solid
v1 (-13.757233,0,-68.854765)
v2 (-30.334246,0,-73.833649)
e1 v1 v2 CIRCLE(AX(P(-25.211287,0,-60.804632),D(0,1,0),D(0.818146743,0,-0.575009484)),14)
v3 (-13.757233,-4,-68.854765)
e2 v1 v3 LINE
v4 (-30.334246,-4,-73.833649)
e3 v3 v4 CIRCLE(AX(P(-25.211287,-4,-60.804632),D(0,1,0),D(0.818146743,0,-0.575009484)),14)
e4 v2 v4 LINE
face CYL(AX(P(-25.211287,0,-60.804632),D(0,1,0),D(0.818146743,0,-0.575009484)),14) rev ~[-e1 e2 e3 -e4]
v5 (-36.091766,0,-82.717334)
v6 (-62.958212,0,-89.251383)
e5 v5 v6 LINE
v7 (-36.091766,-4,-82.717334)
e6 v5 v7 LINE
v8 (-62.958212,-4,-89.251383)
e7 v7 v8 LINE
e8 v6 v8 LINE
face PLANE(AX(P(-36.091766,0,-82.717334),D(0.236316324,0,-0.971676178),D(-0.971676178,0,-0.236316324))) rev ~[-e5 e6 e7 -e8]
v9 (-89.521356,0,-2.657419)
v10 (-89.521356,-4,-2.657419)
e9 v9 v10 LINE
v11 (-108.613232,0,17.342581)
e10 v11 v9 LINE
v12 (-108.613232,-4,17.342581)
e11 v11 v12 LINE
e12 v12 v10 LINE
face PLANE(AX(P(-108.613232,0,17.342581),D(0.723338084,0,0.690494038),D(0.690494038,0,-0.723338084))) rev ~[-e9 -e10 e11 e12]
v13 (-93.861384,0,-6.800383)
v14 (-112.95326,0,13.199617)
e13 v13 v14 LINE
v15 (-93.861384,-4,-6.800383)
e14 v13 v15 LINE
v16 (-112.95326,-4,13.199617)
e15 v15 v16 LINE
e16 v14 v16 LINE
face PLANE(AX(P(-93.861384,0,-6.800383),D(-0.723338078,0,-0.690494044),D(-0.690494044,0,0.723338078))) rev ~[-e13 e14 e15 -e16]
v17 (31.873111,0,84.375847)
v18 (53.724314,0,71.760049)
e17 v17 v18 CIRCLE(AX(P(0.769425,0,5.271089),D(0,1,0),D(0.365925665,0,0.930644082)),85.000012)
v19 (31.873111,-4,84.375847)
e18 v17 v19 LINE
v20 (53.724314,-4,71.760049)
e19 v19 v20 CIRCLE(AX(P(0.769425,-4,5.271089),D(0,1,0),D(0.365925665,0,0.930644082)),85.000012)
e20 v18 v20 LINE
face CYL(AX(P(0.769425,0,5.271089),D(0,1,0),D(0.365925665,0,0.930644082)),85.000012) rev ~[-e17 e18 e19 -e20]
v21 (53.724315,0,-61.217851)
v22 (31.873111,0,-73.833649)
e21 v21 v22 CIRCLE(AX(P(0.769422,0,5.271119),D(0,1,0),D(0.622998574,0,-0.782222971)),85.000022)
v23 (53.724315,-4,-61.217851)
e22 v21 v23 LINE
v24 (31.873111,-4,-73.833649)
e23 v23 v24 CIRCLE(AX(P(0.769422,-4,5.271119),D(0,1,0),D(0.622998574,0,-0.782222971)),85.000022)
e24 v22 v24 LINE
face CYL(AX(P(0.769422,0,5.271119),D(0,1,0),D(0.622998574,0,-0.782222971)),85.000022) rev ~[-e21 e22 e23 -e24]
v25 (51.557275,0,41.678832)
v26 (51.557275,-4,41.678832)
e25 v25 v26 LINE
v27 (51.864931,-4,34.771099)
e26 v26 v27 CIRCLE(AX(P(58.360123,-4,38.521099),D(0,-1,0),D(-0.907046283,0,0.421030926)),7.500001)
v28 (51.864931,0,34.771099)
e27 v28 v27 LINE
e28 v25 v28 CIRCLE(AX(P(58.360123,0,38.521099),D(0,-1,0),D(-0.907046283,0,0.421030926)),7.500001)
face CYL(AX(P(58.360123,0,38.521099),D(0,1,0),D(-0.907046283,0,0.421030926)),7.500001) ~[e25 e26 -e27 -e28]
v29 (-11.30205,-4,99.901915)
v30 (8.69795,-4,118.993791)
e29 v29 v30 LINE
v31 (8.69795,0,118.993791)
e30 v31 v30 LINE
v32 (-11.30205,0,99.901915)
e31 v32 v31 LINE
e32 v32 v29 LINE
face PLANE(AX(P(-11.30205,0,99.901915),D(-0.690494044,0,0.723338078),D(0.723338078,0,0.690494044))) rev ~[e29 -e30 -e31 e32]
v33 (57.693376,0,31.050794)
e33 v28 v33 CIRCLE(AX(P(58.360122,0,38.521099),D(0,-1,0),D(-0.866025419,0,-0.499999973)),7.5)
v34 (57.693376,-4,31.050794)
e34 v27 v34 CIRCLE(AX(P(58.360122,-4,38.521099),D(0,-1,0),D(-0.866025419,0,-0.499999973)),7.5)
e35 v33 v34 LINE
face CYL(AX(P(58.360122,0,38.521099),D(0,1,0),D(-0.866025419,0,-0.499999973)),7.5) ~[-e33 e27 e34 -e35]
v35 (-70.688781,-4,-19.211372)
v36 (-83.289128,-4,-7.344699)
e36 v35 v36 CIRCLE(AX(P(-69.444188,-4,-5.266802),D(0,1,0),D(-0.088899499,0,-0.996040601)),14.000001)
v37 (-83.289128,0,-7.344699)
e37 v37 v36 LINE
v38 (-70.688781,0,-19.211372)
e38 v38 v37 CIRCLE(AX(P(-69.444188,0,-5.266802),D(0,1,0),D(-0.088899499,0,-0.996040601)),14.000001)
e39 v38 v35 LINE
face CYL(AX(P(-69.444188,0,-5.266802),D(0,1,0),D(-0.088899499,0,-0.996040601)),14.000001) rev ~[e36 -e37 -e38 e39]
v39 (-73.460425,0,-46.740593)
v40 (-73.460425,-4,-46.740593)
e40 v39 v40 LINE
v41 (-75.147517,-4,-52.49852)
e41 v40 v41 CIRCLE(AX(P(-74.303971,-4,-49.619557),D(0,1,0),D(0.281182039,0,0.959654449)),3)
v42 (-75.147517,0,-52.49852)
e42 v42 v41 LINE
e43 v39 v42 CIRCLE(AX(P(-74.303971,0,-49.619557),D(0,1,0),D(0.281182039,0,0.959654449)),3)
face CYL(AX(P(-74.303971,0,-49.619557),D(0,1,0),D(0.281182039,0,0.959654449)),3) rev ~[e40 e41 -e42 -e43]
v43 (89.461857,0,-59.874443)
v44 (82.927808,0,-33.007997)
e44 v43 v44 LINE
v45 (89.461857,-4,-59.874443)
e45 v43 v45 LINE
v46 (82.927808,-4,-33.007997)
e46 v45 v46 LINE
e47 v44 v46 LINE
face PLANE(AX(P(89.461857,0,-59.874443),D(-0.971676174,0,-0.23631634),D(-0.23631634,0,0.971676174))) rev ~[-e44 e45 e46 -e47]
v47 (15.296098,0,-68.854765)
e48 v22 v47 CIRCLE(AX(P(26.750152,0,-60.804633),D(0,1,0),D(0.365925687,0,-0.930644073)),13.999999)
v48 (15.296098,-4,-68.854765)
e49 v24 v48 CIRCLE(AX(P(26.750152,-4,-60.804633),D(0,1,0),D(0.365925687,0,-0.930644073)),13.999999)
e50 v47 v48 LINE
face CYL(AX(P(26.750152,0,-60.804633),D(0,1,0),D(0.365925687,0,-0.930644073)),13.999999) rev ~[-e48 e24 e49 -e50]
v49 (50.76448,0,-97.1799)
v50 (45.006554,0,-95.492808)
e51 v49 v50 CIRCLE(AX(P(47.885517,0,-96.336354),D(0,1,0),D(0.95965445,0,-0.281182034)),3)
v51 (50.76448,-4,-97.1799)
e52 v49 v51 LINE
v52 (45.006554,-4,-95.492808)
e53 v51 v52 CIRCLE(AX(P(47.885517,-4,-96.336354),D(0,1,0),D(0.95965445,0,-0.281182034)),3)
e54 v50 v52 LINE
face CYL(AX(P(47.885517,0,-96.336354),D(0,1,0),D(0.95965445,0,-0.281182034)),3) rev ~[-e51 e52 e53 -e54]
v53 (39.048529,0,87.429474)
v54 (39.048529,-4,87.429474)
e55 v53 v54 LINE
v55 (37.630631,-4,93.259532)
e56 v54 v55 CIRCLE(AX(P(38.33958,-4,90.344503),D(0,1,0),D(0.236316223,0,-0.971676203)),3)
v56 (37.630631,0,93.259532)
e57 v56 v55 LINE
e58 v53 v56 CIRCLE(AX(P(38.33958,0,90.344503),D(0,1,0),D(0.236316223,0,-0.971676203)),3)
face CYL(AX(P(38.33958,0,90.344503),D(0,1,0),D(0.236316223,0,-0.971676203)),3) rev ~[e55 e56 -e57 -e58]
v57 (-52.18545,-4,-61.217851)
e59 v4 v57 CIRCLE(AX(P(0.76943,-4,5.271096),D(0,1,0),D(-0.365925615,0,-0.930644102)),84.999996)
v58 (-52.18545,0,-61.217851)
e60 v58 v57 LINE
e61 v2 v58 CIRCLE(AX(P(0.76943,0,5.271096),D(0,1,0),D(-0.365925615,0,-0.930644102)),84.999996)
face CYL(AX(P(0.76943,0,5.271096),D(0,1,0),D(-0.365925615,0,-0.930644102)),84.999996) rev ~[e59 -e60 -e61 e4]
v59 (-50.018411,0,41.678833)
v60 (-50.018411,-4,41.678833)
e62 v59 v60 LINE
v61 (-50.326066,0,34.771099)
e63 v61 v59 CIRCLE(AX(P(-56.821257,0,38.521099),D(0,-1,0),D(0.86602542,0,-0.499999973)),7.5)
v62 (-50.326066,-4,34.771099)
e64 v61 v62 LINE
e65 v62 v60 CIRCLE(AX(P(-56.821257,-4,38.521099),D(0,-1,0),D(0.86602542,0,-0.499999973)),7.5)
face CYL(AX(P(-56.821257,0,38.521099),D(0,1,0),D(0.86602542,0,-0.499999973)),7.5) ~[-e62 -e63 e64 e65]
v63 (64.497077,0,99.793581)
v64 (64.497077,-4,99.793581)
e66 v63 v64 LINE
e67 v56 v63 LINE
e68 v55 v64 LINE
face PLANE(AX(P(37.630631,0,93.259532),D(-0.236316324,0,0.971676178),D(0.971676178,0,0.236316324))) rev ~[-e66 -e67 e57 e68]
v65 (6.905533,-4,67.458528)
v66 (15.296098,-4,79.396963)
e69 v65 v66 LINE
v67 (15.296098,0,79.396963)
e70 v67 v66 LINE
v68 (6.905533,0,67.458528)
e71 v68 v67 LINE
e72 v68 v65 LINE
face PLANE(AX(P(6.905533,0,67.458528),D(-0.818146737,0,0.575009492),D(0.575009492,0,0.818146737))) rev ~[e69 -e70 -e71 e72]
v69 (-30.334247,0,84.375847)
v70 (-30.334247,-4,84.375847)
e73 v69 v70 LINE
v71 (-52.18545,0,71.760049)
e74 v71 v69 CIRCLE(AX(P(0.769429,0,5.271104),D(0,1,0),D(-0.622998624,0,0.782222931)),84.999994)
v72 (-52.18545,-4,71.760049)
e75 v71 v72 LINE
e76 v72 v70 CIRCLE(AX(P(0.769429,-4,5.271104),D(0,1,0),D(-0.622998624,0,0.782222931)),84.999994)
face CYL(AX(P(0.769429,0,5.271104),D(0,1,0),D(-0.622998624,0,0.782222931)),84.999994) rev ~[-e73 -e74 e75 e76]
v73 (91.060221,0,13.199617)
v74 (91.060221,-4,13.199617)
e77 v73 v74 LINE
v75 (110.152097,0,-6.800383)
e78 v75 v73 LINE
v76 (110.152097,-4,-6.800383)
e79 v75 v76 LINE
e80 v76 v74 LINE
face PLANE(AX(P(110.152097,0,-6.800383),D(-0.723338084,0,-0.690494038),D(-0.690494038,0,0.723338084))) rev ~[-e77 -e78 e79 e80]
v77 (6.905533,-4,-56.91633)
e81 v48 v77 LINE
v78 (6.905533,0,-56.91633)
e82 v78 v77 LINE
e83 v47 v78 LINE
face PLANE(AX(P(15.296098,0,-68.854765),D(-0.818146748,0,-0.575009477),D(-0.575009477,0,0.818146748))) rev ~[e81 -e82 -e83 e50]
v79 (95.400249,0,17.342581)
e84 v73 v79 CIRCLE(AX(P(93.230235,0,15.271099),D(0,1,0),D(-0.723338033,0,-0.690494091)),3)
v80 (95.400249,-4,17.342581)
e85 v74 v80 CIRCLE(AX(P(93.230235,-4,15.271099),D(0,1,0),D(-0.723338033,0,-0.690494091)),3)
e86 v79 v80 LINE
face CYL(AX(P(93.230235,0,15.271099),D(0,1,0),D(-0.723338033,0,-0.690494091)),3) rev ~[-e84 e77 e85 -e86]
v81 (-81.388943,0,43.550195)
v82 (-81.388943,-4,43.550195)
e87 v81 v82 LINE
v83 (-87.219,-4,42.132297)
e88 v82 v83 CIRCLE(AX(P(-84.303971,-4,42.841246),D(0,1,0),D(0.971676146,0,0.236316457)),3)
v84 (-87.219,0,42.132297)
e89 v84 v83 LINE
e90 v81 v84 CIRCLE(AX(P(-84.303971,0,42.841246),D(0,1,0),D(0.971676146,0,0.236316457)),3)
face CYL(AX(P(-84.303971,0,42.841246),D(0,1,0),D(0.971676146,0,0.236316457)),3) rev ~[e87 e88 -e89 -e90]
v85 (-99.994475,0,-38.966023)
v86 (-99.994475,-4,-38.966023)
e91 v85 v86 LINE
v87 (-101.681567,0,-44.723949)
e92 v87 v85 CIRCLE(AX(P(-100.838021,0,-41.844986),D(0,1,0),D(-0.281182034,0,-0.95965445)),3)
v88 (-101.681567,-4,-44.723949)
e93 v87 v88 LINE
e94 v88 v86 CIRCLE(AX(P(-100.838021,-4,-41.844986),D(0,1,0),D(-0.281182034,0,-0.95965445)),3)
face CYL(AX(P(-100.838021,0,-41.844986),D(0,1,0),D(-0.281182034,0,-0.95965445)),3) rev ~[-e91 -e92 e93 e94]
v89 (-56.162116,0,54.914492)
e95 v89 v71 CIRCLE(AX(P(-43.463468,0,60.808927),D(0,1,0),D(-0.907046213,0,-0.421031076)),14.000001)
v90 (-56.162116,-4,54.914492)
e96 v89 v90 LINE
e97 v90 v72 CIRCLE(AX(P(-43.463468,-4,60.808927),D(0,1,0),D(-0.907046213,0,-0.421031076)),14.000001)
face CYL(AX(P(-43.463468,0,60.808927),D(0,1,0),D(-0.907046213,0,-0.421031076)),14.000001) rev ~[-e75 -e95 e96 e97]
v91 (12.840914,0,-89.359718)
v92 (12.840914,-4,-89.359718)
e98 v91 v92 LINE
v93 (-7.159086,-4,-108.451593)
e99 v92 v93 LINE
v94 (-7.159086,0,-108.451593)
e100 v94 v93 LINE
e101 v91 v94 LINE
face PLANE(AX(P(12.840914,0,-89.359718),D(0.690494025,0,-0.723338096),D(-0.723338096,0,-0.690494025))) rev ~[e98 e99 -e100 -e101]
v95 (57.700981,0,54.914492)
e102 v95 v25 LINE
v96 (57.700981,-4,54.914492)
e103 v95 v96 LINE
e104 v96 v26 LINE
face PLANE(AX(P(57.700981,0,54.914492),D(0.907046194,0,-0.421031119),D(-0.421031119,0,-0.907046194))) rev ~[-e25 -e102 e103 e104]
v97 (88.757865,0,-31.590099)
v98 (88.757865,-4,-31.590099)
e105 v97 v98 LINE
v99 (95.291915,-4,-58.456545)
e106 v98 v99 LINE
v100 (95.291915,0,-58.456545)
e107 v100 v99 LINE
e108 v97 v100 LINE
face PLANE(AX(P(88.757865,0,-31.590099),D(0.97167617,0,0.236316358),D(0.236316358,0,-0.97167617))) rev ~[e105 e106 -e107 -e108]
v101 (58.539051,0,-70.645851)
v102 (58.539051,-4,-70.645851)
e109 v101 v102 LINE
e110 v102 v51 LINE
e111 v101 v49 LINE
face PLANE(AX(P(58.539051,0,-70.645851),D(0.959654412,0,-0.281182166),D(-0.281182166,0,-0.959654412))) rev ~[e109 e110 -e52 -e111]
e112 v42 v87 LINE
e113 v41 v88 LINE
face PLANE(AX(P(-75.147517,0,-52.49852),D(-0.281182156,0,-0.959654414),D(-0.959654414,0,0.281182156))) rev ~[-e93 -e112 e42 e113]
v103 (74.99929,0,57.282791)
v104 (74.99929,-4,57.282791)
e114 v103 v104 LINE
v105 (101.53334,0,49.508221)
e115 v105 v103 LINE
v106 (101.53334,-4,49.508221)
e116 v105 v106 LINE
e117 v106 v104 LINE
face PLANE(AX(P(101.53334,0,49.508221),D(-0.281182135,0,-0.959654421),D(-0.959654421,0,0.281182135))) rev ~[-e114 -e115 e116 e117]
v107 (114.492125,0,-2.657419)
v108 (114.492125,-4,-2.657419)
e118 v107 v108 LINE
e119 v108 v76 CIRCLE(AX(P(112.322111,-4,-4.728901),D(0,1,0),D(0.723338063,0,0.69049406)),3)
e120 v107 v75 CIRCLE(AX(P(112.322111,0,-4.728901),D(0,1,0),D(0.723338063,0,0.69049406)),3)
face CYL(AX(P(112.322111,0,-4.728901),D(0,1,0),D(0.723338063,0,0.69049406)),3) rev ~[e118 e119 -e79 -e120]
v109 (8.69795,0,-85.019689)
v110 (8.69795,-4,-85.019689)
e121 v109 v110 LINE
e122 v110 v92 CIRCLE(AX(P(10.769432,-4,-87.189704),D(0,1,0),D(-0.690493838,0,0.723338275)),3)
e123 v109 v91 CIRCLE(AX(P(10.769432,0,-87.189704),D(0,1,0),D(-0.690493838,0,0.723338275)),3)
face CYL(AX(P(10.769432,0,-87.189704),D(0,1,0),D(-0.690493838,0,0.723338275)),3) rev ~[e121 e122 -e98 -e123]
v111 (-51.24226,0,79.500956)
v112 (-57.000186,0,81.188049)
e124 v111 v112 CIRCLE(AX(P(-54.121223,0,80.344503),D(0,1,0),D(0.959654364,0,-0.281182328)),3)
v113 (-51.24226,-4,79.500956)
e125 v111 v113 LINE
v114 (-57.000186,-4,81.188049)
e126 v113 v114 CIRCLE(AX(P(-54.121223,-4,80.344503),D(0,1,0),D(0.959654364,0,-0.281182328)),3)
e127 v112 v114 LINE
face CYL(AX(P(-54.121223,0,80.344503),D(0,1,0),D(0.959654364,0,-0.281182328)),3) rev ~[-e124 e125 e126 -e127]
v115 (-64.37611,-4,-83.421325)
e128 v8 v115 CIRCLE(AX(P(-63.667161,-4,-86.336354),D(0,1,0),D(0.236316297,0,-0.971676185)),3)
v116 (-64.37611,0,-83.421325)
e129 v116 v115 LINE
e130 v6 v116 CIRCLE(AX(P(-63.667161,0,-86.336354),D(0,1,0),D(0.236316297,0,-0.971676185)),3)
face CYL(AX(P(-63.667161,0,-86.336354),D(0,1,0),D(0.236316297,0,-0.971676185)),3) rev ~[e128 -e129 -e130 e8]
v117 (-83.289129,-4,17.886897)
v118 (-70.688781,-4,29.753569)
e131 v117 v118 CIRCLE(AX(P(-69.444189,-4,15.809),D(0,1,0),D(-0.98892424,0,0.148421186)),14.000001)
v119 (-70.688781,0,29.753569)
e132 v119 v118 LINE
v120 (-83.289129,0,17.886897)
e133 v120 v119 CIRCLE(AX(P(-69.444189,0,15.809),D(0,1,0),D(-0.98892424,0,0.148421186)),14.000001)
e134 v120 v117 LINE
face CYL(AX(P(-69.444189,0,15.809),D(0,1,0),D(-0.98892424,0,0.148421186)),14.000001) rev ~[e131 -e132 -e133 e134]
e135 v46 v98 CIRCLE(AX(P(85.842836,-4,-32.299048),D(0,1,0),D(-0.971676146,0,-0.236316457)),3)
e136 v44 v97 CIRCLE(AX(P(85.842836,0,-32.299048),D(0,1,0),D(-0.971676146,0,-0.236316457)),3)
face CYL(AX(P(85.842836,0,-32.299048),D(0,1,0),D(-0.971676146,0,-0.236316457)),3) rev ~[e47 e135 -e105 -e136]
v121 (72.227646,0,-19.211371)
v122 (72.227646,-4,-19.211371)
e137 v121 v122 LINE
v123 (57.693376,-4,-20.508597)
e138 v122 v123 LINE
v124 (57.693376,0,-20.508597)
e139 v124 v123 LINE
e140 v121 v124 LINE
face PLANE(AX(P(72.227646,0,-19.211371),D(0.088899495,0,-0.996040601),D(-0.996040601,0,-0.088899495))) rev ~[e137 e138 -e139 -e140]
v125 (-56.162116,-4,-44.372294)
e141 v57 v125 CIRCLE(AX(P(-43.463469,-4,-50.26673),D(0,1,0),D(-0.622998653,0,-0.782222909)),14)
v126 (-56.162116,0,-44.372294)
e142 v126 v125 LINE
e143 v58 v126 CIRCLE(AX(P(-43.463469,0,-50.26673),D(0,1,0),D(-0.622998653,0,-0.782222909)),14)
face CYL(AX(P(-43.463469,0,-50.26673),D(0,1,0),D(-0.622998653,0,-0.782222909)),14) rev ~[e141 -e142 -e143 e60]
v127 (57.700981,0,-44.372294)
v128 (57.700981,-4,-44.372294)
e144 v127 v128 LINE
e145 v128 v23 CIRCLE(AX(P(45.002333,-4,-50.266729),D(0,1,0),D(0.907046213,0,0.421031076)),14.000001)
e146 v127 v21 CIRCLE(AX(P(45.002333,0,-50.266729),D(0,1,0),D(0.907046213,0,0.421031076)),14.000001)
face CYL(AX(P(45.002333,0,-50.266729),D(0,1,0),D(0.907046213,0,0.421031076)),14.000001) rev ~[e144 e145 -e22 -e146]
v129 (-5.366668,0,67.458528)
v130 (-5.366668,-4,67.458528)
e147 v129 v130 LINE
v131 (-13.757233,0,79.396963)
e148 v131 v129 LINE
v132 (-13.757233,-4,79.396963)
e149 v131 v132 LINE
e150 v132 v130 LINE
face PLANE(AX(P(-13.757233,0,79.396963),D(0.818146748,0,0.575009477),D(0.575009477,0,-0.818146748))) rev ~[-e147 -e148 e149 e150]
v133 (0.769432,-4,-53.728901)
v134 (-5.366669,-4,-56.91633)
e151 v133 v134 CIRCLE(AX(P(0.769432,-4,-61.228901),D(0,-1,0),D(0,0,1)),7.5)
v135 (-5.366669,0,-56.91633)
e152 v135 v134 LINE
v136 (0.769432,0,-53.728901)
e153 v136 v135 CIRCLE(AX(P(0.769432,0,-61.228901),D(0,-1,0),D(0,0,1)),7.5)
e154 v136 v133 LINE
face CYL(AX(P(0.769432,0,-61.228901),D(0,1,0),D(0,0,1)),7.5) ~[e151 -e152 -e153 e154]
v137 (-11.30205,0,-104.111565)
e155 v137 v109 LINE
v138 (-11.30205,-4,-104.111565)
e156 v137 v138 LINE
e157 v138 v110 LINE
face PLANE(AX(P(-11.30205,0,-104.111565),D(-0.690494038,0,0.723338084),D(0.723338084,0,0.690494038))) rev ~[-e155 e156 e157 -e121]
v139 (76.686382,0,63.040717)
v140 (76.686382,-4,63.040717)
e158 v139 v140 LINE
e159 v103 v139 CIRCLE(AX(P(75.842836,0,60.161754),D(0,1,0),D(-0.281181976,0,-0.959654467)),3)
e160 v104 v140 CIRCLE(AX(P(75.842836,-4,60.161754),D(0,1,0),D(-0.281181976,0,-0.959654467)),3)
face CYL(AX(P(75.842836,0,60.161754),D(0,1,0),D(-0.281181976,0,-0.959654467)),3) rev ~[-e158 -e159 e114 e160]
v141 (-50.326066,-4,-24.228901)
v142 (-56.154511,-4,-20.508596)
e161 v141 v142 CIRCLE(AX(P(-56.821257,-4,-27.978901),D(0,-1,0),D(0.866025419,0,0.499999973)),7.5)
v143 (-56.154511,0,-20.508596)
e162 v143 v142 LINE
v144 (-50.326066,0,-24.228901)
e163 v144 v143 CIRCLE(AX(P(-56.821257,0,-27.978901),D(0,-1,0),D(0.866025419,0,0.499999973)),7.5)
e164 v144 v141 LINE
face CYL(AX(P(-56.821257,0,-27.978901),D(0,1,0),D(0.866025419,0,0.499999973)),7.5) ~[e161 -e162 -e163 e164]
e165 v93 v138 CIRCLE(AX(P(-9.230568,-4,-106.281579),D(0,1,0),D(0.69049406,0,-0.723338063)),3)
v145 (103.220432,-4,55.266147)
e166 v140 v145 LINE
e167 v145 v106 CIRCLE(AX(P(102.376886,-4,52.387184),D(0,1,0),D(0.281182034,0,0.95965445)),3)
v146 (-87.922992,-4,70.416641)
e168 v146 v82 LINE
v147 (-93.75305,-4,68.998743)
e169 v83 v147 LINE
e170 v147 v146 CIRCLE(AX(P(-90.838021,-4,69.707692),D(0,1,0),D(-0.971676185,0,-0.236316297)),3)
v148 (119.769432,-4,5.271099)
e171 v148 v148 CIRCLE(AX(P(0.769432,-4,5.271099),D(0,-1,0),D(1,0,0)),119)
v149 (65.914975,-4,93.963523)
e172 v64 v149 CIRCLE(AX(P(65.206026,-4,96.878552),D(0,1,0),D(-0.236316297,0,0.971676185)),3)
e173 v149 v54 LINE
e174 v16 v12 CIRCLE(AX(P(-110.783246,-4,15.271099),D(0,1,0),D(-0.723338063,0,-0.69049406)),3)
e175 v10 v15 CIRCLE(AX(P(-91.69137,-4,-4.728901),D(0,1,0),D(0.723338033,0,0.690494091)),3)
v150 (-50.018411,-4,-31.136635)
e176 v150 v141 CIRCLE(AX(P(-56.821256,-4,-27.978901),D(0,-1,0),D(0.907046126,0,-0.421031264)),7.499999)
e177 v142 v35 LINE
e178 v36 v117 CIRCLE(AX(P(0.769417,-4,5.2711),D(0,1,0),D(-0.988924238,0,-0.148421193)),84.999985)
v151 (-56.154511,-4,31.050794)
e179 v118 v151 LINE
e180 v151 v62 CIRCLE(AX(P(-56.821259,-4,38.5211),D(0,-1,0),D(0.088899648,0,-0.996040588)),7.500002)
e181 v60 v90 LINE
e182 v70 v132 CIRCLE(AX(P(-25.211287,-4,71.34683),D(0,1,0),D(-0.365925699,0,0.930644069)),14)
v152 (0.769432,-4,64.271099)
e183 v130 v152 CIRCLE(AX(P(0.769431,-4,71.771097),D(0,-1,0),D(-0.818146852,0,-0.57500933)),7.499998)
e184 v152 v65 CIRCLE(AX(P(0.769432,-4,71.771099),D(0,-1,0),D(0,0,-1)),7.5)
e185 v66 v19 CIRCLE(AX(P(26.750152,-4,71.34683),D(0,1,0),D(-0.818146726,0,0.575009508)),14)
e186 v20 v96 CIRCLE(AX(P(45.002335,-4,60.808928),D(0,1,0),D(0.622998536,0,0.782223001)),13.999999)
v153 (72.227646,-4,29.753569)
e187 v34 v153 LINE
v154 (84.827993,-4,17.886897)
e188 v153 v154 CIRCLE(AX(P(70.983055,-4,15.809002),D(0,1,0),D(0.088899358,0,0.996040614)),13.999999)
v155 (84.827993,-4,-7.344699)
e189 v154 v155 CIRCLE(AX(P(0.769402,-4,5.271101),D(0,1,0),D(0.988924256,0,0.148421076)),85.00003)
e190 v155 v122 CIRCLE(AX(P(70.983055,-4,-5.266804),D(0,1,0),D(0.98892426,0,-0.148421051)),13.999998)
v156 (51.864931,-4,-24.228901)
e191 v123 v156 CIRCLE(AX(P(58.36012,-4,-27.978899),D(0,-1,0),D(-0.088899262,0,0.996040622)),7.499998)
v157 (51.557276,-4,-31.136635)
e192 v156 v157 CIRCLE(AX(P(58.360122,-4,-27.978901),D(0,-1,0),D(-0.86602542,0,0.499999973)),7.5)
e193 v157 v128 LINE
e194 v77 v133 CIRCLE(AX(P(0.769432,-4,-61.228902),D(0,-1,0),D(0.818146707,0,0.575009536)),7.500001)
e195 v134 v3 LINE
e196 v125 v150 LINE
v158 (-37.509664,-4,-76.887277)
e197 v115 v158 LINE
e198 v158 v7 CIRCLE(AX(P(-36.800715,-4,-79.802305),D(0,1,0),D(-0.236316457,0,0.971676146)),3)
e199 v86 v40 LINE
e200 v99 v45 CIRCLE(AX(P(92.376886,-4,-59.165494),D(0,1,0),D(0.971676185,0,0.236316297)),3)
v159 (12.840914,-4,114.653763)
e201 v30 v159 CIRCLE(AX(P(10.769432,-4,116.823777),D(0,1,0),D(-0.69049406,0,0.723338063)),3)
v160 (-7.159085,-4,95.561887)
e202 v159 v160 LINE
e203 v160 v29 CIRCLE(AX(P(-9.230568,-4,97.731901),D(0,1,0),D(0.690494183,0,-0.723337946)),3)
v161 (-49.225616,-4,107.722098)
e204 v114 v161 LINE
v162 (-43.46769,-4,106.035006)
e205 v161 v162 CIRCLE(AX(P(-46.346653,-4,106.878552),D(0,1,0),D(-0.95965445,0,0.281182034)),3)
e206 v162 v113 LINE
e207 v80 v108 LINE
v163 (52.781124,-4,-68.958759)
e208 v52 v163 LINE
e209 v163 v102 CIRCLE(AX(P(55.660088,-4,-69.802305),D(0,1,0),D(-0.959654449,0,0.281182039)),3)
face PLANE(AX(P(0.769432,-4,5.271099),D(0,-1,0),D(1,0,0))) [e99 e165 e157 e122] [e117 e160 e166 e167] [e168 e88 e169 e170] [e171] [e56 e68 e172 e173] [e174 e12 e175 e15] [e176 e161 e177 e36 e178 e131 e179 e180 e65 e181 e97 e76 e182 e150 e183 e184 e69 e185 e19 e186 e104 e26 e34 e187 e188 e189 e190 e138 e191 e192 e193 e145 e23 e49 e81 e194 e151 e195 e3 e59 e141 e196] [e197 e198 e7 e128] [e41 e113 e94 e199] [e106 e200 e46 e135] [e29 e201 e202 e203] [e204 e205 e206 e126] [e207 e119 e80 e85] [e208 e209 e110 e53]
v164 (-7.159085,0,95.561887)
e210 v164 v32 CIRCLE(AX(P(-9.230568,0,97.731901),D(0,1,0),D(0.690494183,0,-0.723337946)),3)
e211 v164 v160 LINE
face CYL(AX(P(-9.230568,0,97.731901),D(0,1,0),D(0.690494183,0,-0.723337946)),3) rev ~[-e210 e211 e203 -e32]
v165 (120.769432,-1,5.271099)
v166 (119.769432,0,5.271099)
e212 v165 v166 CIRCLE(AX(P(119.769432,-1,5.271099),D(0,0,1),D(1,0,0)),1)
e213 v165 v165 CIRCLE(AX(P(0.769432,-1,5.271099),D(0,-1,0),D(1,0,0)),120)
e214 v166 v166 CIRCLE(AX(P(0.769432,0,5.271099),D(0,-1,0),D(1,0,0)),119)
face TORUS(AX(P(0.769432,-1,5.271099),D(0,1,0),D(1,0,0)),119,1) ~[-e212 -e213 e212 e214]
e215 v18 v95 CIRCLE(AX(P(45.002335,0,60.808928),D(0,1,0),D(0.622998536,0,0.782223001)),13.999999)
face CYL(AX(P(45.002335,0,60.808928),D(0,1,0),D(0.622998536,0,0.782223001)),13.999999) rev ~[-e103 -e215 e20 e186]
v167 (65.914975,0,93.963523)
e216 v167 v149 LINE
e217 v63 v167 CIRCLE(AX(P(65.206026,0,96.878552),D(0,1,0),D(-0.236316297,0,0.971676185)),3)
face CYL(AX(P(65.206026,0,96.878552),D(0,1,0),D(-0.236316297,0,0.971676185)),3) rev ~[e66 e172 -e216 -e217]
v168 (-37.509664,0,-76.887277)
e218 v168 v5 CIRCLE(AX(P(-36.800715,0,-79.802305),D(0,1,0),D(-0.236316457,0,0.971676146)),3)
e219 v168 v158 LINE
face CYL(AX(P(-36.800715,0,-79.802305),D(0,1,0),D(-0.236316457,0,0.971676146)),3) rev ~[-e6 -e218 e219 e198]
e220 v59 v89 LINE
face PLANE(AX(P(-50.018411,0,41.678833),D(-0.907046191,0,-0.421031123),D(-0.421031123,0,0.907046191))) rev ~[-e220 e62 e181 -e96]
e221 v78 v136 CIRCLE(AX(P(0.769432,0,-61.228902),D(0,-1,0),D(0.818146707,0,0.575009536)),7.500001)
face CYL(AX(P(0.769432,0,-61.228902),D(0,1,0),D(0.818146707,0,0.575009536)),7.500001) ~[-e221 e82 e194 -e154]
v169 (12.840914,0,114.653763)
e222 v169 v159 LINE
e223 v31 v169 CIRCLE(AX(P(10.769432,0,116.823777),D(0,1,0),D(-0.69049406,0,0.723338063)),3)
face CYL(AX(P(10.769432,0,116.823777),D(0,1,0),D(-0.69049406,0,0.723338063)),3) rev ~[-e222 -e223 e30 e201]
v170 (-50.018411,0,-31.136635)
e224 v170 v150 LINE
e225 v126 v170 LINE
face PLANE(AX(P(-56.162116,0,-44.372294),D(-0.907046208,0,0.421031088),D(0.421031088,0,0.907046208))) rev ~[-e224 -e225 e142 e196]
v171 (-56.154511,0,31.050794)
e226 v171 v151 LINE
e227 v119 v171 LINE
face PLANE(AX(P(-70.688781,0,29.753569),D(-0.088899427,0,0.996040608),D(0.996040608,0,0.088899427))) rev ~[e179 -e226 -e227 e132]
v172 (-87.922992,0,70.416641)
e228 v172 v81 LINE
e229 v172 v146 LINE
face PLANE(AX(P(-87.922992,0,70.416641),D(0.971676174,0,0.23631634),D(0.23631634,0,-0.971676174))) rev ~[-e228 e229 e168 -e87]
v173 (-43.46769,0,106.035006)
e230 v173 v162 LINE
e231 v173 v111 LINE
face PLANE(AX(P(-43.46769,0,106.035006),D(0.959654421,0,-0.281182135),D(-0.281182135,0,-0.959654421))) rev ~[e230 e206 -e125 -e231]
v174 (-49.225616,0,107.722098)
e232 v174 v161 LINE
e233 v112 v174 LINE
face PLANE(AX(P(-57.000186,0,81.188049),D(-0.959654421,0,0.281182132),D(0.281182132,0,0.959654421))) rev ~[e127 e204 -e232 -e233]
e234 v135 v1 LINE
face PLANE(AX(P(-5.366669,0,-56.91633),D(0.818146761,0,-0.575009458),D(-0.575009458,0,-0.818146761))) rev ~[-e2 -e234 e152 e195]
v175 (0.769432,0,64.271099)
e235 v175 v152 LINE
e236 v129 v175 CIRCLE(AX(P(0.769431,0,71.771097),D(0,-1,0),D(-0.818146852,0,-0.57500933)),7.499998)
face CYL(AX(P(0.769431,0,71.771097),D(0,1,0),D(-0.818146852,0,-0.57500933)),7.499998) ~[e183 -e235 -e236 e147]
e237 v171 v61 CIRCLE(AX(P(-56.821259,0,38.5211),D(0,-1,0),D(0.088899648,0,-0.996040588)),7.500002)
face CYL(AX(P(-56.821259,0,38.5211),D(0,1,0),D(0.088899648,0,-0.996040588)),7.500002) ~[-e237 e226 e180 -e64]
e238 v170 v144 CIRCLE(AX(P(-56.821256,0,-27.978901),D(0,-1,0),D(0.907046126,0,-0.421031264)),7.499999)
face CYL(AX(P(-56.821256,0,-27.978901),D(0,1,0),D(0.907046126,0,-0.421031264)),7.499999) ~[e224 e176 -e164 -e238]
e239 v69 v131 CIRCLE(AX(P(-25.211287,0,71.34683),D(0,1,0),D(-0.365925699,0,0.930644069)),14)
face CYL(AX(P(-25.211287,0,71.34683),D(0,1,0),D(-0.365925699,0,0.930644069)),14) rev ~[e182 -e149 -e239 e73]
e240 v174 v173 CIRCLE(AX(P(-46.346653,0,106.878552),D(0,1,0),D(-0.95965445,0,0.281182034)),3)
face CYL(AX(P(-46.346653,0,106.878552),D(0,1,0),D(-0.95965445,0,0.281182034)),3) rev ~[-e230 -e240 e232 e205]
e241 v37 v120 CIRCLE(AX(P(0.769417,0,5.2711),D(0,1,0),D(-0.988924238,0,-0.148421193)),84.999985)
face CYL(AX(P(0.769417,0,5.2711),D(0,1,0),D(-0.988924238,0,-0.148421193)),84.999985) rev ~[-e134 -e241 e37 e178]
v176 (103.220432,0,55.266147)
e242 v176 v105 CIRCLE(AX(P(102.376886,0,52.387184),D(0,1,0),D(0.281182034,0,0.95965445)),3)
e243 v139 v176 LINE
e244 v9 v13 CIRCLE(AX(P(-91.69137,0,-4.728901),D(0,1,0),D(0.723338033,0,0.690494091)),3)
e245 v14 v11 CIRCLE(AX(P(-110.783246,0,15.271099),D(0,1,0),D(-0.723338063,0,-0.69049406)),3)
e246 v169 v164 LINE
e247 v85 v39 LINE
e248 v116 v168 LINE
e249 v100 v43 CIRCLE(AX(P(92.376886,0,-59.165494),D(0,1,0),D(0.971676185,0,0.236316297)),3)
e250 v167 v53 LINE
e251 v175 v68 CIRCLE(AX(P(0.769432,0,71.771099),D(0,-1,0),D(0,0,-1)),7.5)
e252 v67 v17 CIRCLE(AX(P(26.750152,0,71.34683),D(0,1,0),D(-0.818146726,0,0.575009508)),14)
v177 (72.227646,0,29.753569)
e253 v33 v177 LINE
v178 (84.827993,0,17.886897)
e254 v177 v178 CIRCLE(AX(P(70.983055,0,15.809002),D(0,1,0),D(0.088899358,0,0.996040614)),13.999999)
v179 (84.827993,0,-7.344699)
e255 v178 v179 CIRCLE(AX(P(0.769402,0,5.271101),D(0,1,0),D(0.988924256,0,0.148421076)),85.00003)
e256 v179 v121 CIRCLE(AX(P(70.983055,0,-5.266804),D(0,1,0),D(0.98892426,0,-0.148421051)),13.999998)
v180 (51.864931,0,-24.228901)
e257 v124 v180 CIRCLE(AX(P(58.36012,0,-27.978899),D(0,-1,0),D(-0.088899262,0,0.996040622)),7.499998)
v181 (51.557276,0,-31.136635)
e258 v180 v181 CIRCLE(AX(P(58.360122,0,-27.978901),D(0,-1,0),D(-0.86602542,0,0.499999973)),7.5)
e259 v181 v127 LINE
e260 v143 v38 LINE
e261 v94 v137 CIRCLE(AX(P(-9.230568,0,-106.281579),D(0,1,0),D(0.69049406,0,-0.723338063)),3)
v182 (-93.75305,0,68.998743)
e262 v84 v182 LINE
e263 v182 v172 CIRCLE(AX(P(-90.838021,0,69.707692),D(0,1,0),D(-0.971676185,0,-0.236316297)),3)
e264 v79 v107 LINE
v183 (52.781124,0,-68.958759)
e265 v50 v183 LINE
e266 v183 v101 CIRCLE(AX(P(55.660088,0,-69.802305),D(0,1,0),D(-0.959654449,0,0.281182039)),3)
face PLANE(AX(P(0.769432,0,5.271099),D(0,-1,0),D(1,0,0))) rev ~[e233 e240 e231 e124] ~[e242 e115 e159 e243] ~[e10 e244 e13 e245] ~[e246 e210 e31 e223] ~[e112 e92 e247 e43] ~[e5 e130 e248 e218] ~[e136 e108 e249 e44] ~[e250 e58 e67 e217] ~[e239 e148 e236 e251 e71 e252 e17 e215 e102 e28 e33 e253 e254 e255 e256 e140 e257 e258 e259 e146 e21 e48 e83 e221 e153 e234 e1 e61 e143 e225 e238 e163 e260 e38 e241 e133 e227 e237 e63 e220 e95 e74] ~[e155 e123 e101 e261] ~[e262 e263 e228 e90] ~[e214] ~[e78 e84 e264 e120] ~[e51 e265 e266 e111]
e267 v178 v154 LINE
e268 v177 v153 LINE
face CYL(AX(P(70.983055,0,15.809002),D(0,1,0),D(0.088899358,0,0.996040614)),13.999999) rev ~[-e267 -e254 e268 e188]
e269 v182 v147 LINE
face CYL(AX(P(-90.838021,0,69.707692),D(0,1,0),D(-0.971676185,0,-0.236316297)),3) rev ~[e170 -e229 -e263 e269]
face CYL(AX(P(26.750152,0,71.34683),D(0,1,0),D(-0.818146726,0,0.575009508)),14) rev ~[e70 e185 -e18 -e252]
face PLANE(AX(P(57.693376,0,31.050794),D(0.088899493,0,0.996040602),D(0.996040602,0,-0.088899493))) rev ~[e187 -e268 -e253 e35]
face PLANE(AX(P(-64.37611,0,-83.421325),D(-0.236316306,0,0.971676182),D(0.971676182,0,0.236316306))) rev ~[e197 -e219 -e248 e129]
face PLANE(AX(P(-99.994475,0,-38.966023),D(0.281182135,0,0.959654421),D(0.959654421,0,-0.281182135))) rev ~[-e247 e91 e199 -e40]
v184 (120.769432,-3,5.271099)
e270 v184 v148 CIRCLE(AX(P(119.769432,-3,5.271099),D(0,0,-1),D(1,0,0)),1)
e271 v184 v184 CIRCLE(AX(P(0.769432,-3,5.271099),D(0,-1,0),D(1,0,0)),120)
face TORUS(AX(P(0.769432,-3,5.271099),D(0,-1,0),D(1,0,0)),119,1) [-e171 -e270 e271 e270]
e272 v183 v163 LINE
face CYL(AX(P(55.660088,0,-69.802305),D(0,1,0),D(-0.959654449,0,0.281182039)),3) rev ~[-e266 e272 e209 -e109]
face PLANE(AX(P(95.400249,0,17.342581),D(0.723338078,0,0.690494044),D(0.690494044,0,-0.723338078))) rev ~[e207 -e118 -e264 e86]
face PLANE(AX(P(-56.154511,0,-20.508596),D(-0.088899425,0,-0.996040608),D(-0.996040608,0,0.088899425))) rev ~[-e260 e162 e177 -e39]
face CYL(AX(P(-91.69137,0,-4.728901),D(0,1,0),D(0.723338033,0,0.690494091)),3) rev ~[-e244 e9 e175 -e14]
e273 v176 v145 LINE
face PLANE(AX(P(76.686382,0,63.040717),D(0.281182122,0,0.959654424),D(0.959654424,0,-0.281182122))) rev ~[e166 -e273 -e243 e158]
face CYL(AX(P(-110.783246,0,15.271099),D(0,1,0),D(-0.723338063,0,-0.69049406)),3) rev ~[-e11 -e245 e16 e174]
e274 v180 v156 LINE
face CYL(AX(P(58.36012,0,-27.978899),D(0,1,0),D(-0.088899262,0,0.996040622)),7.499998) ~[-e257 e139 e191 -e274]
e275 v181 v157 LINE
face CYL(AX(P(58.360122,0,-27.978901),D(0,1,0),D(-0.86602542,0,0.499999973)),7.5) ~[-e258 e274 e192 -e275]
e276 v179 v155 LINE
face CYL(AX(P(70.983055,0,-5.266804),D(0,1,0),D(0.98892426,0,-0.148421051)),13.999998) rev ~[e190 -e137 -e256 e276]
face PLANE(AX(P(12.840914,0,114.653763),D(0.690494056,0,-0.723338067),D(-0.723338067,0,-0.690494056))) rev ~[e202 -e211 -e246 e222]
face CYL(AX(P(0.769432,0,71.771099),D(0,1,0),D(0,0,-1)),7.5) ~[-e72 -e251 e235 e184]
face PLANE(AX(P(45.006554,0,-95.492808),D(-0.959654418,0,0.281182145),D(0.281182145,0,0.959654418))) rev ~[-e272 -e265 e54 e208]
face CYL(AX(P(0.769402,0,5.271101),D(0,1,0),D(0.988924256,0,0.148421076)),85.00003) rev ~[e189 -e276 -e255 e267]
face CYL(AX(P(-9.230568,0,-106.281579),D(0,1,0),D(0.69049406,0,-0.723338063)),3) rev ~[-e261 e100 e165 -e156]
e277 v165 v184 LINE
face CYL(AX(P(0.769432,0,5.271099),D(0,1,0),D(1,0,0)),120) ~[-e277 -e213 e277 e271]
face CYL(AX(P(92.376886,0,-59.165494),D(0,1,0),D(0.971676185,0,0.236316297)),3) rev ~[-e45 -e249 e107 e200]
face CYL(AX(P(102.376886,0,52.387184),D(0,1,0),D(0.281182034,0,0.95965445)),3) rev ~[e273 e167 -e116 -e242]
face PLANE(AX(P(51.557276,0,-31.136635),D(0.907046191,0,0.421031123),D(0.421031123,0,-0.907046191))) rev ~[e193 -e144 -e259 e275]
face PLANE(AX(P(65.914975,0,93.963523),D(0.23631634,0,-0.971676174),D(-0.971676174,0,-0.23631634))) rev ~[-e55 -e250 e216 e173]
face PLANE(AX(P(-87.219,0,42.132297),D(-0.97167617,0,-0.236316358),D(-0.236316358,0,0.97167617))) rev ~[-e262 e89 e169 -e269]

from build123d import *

# Parameters (mm, degrees)
F0_R     = 120
F1_DEPTH = 4
F2_R     = 1
F3_R     = 1


# Not quite as in the source:
# - ends of sketch curves that miss each other by under 0.0002 mm in the source are joined


with BuildPart() as f1:
    # F0 (on Front) → F1 (new body)
    with BuildSketch(Plane.XZ):
        with Locations((0.769432, 5.271099)):
            Circle(F0_R)
        with BuildLine():
            ThreePointArc((-62.9582121085, -89.2513825538), (-66.5821895538, -87.0453028915), (-64.3761098915, -83.4213254462))
            Line((-64.3761098915, -83.4213254462), (-37.509664, -76.887277))
            ThreePointArc((-37.509664, -76.887277), (-33.8856864462, -79.0933561085), (-36.0917661085, -82.7173335538))
            Line((-36.0917661085, -82.7173335538), (-62.9582121085, -89.2513825538))
        make_face(mode=Mode.SUBTRACT)
        with BuildLine():
            ThreePointArc((-101.6815671027, -44.7239493504), (-103.7169843504, -41.0014398973), (-99.9944748973, -38.9660226496))
            Line((-99.9944748973, -38.9660226496), (-73.460425, -46.740593))
            ThreePointArc((-73.460425, -46.740593), (-71.4250076496, -50.4631031027), (-75.1475171027, -52.4985203504))
            Line((-75.1475171027, -52.4985203504), (-101.6815671027, -44.7239493504))
        make_face(mode=Mode.SUBTRACT)
        with BuildLine():
            ThreePointArc((-112.9532601885, 13.1996168201), (-112.8547281799, 17.4411131885), (-108.6132318115, 17.3425811799))
            Line((-108.6132318115, 17.3425811799), (-89.521356, -2.657419))
            ThreePointArc((-89.521356, -2.657419), (-89.6198878201, -6.8989151885), (-93.8613841885, -6.8003831799))
            Line((-93.8613841885, -6.8003831799), (-112.9532601885, 13.1996168201))
        make_face(mode=Mode.SUBTRACT)
        with BuildLine():
            ThreePointArc((-7.1590858201, -108.4515931885), (-11.4005821885, -108.3530611799), (-11.3020501799, -104.1115648115))
            Line((-11.3020501799, -104.1115648115), (8.69795, -85.019689))
            ThreePointArc((8.69795, -85.019689), (12.9394461885, -85.1182218201), (12.8409141799, -89.3597181885))
            Line((12.8409141799, -89.3597181885), (-7.1590858201, -108.4515931885))
        make_face(mode=Mode.SUBTRACT)
        with BuildLine():
            ThreePointArc((50.7644803504, -97.1799001027), (47.0419708973, -99.2153173504), (45.0065536496, -95.4928078973))
            Line((45.0065536496, -95.4928078973), (52.781124, -68.958759))
            ThreePointArc((52.781124, -68.958759), (56.5036341027, -66.9233416496), (58.5390513504, -70.6458511027))
            Line((58.5390513504, -70.6458511027), (50.7644803504, -97.1799001027))
        make_face(mode=Mode.SUBTRACT)
        with BuildLine():
            ThreePointArc((95.2919145538, -58.4565451085), (93.0858348915, -62.0805225538), (89.4618574462, -59.8744428915))
            Line((89.4618574462, -59.8744428915), (82.927808, -33.007997))
            ThreePointArc((82.927808, -33.007997), (85.1338871085, -29.3840194462), (88.7578645538, -31.5900991085))
            Line((88.7578645538, -31.5900991085), (95.2919145538, -58.4565451085))
        make_face(mode=Mode.SUBTRACT)
        with BuildLine():
            ThreePointArc((114.4921251885, -2.6574188201), (114.3935931799, -6.8989151885), (110.1520968115, -6.8003831799))
            Line((110.1520968115, -6.8003831799), (91.060221, 13.199617))
            ThreePointArc((91.060221, 13.199617), (91.1587528201, 17.4411131885), (95.4002491885, 17.3425811799))
            Line((95.4002491885, 17.3425811799), (114.4921251885, -2.6574188201))
        make_face(mode=Mode.SUBTRACT)
        with BuildLine():
            ThreePointArc((-93.7530495538, 68.9987431085), (-91.5469698915, 72.6227205538), (-87.9229924462, 70.4166408915))
            Line((-87.9229924462, 70.4166408915), (-81.388943, 43.550195))
            ThreePointArc((-81.388943, 43.550195), (-83.5950221085, 39.9262174462), (-87.2189995538, 42.1322971085))
            Line((-87.2189995538, 42.1322971085), (-93.7530495538, 68.9987431085))
        make_face(mode=Mode.SUBTRACT)
        with BuildLine():
            ThreePointArc((-49.2256163504, 107.7220981027), (-45.5031068973, 109.7575153504), (-43.4676896496, 106.0350058973))
            Line((-43.4676896496, 106.0350058973), (-51.24226, 79.500956))
            ThreePointArc((-51.24226, 79.500956), (-54.9647691027, 77.4655396496), (-57.0001863504, 81.1880491027))
            Line((-57.0001863504, 81.1880491027), (-49.2256163504, 107.7220981027))
        make_face(mode=Mode.SUBTRACT)
        with BuildLine():
            ThreePointArc((15.296097835, 79.396963116), (22.7229925826, 84.7551105395), (31.8731110928, 84.3758472359))
            ThreePointArc((31.8731110928, 84.3758472359), (43.2694321028, 78.8832582623), (53.724314001, 71.7600490012))
            ThreePointArc((53.724314001, 71.7600490012), (58.6278254217, 64.0254452963), (57.7009806311, 54.9144921712))
            Line((57.7009806311, 54.9144921712), (51.557275, 41.678832))
            ThreePointArc((51.557275, 41.678832), (50.8675495212, 38.1873960638), (51.8649313537, 34.7710992042))
            ThreePointArc((51.8649313537, 34.7710992042), (54.3248400002, 32.1991927067), (57.6933760416, 31.0507944662))
            Line((57.6933760416, 31.0507944662), (72.227646, 29.753569))
            ThreePointArc((72.227646, 29.753569), (80.5813855597, 26.0007639127), (84.8279934344, 17.8868970652))
            ThreePointArc((84.8279934344, 17.8868970652), (85.769432, 5.271099), (84.8279927873, -7.3446989681))
            ThreePointArc((84.8279927873, -7.3446989681), (80.5813855597, -15.4585659127), (72.2276460446, -19.2113714997))
            Line((72.2276460446, -19.2113714997), (57.693376, -20.508597))
            ThreePointArc((57.693376, -20.508597), (54.3248400002, -21.6569947067), (51.8649313537, -24.2289012042))
            ThreePointArc((51.8649313537, -24.2289012042), (50.8675495212, -27.6451980638), (51.5572758618, -31.1366350642))
            Line((51.5572758618, -31.1366350642), (57.700981, -44.372294))
            ThreePointArc((57.700981, -44.372294), (58.6278254217, -53.4832472963), (53.7243149172, -61.217850896))
            ThreePointArc((53.7243149172, -61.217850896), (43.2694321028, -68.3410602623), (31.8731109925, -73.833648981))
            ThreePointArc((31.8731109925, -73.833648981), (22.7229925826, -74.2129125395), (15.296097835, -68.854765116))
            Line((15.296097835, -68.854765116), (6.905533, -56.91633))
            ThreePointArc((6.905533, -56.91633), (4.2267227516, -54.5732912865), (0.769432, -53.728901))
            ThreePointArc((0.769432, -53.728901), (-2.6878587516, -54.5732912865), (-5.3666687757, -56.9163301576))
            Line((-5.3666687757, -56.9163301576), (-13.757233, -68.854765))
            ThreePointArc((-13.757233, -68.854765), (-21.1841275826, -74.2129125395), (-30.3342460928, -73.8336492359))
            ThreePointArc((-30.3342460928, -73.8336492359), (-41.7305681028, -68.3410602623), (-52.185450001, -61.2178510012))
            ThreePointArc((-52.185450001, -61.2178510012), (-57.0889604217, -53.4832472963), (-56.1621156311, -44.3722941712))
            Line((-56.1621156311, -44.3722941712), (-50.018411, -31.136635))
            ThreePointArc((-50.018411, -31.136635), (-49.3286845212, -27.6451980638), (-50.3260663537, -24.2289012042))
            ThreePointArc((-50.3260663537, -24.2289012042), (-52.7859750002, -21.6569947067), (-56.1545110416, -20.5085964662))
            Line((-56.1545110416, -20.5085964662), (-70.688781, -19.211372))
            ThreePointArc((-70.688781, -19.211372), (-79.0425205597, -15.4585659127), (-83.2891284344, -7.3446990652))
            ThreePointArc((-83.2891284344, -7.3446990652), (-84.230568, 5.271099), (-83.2891287873, 17.8868969681))
            ThreePointArc((-83.2891287873, 17.8868969681), (-79.0425205597, 26.0007639127), (-70.6887810446, 29.7535694997))
            Line((-70.6887810446, 29.7535694997), (-56.154511, 31.050794))
            ThreePointArc((-56.154511, 31.050794), (-52.7859750002, 32.1991927067), (-50.3260663537, 34.7710992042))
            ThreePointArc((-50.3260663537, 34.7710992042), (-49.3286845212, 38.1873960638), (-50.0184108618, 41.6788330642))
            Line((-50.0184108618, 41.6788330642), (-56.162116, 54.914492))
            ThreePointArc((-56.162116, 54.914492), (-57.0889604217, 64.0254452963), (-52.1854499172, 71.760048896))
            ThreePointArc((-52.1854499172, 71.760048896), (-41.7305681028, 78.8832582623), (-30.3342469925, 84.375846981))
            ThreePointArc((-30.3342469925, 84.375846981), (-21.1841275826, 84.7551105395), (-13.757232835, 79.396963116))
            Line((-13.757232835, 79.396963116), (-5.366668, 67.458528))
            ThreePointArc((-5.366668, 67.458528), (-2.6878587516, 65.1154892865), (0.769432, 64.271099))
            ThreePointArc((0.769432, 64.271099), (4.2267227516, 65.1154892865), (6.9055327757, 67.4585281576))
            Line((6.9055327757, 67.4585281576), (15.296097835, 79.396963116))
        make_face(mode=Mode.SUBTRACT)
        with BuildLine():
            ThreePointArc((103.2204321027, 55.2661473504), (105.2558493504, 51.5436378973), (101.5333398973, 49.5082206496))
            Line((101.5333398973, 49.5082206496), (74.99929, 57.282791))
            ThreePointArc((74.99929, 57.282791), (72.9638726496, 61.0053001027), (76.6863821027, 63.0407173504))
            Line((76.6863821027, 63.0407173504), (103.2204321027, 55.2661473504))
        make_face(mode=Mode.SUBTRACT)
        with BuildLine():
            ThreePointArc((64.4970771085, 99.7935805538), (68.1210545538, 97.5875008915), (65.9149748915, 93.9635234462))
            Line((65.9149748915, 93.9635234462), (39.048529, 87.429474))
            ThreePointArc((39.048529, 87.429474), (35.4245514462, 89.6355541085), (37.6306311085, 93.2595315538))
            Line((37.6306311085, 93.2595315538), (64.4970771085, 99.7935805538))
        make_face(mode=Mode.SUBTRACT)
        with BuildLine():
            ThreePointArc((8.6979498201, 118.9937911885), (12.9394461885, 118.8952591799), (12.8409141799, 114.6537628115))
            Line((12.8409141799, 114.6537628115), (-7.159085, 95.561887))
            ThreePointArc((-7.159085, 95.561887), (-11.4005821885, 95.6604188201), (-11.3020501799, 99.9019151885))
            Line((-11.3020501799, 99.9019151885), (8.6979498201, 118.9937911885))
        make_face(mode=Mode.SUBTRACT)
    extrude(amount=F1_DEPTH)

    # F2
    f2_edges = [f1.edges().sort_by_distance(p)[0] for p in [
        (-119.230568, -4, 5.271099),
    ]]
    fillet(f2_edges, radius=F2_R)

    # F3
    f3_edges = [f1.edges().sort_by_distance(p)[0] for p in [
        (-119.230568, 0, 5.271099),
    ]]
    fillet(f3_edges, radius=F3_R)


solid = f1.part
